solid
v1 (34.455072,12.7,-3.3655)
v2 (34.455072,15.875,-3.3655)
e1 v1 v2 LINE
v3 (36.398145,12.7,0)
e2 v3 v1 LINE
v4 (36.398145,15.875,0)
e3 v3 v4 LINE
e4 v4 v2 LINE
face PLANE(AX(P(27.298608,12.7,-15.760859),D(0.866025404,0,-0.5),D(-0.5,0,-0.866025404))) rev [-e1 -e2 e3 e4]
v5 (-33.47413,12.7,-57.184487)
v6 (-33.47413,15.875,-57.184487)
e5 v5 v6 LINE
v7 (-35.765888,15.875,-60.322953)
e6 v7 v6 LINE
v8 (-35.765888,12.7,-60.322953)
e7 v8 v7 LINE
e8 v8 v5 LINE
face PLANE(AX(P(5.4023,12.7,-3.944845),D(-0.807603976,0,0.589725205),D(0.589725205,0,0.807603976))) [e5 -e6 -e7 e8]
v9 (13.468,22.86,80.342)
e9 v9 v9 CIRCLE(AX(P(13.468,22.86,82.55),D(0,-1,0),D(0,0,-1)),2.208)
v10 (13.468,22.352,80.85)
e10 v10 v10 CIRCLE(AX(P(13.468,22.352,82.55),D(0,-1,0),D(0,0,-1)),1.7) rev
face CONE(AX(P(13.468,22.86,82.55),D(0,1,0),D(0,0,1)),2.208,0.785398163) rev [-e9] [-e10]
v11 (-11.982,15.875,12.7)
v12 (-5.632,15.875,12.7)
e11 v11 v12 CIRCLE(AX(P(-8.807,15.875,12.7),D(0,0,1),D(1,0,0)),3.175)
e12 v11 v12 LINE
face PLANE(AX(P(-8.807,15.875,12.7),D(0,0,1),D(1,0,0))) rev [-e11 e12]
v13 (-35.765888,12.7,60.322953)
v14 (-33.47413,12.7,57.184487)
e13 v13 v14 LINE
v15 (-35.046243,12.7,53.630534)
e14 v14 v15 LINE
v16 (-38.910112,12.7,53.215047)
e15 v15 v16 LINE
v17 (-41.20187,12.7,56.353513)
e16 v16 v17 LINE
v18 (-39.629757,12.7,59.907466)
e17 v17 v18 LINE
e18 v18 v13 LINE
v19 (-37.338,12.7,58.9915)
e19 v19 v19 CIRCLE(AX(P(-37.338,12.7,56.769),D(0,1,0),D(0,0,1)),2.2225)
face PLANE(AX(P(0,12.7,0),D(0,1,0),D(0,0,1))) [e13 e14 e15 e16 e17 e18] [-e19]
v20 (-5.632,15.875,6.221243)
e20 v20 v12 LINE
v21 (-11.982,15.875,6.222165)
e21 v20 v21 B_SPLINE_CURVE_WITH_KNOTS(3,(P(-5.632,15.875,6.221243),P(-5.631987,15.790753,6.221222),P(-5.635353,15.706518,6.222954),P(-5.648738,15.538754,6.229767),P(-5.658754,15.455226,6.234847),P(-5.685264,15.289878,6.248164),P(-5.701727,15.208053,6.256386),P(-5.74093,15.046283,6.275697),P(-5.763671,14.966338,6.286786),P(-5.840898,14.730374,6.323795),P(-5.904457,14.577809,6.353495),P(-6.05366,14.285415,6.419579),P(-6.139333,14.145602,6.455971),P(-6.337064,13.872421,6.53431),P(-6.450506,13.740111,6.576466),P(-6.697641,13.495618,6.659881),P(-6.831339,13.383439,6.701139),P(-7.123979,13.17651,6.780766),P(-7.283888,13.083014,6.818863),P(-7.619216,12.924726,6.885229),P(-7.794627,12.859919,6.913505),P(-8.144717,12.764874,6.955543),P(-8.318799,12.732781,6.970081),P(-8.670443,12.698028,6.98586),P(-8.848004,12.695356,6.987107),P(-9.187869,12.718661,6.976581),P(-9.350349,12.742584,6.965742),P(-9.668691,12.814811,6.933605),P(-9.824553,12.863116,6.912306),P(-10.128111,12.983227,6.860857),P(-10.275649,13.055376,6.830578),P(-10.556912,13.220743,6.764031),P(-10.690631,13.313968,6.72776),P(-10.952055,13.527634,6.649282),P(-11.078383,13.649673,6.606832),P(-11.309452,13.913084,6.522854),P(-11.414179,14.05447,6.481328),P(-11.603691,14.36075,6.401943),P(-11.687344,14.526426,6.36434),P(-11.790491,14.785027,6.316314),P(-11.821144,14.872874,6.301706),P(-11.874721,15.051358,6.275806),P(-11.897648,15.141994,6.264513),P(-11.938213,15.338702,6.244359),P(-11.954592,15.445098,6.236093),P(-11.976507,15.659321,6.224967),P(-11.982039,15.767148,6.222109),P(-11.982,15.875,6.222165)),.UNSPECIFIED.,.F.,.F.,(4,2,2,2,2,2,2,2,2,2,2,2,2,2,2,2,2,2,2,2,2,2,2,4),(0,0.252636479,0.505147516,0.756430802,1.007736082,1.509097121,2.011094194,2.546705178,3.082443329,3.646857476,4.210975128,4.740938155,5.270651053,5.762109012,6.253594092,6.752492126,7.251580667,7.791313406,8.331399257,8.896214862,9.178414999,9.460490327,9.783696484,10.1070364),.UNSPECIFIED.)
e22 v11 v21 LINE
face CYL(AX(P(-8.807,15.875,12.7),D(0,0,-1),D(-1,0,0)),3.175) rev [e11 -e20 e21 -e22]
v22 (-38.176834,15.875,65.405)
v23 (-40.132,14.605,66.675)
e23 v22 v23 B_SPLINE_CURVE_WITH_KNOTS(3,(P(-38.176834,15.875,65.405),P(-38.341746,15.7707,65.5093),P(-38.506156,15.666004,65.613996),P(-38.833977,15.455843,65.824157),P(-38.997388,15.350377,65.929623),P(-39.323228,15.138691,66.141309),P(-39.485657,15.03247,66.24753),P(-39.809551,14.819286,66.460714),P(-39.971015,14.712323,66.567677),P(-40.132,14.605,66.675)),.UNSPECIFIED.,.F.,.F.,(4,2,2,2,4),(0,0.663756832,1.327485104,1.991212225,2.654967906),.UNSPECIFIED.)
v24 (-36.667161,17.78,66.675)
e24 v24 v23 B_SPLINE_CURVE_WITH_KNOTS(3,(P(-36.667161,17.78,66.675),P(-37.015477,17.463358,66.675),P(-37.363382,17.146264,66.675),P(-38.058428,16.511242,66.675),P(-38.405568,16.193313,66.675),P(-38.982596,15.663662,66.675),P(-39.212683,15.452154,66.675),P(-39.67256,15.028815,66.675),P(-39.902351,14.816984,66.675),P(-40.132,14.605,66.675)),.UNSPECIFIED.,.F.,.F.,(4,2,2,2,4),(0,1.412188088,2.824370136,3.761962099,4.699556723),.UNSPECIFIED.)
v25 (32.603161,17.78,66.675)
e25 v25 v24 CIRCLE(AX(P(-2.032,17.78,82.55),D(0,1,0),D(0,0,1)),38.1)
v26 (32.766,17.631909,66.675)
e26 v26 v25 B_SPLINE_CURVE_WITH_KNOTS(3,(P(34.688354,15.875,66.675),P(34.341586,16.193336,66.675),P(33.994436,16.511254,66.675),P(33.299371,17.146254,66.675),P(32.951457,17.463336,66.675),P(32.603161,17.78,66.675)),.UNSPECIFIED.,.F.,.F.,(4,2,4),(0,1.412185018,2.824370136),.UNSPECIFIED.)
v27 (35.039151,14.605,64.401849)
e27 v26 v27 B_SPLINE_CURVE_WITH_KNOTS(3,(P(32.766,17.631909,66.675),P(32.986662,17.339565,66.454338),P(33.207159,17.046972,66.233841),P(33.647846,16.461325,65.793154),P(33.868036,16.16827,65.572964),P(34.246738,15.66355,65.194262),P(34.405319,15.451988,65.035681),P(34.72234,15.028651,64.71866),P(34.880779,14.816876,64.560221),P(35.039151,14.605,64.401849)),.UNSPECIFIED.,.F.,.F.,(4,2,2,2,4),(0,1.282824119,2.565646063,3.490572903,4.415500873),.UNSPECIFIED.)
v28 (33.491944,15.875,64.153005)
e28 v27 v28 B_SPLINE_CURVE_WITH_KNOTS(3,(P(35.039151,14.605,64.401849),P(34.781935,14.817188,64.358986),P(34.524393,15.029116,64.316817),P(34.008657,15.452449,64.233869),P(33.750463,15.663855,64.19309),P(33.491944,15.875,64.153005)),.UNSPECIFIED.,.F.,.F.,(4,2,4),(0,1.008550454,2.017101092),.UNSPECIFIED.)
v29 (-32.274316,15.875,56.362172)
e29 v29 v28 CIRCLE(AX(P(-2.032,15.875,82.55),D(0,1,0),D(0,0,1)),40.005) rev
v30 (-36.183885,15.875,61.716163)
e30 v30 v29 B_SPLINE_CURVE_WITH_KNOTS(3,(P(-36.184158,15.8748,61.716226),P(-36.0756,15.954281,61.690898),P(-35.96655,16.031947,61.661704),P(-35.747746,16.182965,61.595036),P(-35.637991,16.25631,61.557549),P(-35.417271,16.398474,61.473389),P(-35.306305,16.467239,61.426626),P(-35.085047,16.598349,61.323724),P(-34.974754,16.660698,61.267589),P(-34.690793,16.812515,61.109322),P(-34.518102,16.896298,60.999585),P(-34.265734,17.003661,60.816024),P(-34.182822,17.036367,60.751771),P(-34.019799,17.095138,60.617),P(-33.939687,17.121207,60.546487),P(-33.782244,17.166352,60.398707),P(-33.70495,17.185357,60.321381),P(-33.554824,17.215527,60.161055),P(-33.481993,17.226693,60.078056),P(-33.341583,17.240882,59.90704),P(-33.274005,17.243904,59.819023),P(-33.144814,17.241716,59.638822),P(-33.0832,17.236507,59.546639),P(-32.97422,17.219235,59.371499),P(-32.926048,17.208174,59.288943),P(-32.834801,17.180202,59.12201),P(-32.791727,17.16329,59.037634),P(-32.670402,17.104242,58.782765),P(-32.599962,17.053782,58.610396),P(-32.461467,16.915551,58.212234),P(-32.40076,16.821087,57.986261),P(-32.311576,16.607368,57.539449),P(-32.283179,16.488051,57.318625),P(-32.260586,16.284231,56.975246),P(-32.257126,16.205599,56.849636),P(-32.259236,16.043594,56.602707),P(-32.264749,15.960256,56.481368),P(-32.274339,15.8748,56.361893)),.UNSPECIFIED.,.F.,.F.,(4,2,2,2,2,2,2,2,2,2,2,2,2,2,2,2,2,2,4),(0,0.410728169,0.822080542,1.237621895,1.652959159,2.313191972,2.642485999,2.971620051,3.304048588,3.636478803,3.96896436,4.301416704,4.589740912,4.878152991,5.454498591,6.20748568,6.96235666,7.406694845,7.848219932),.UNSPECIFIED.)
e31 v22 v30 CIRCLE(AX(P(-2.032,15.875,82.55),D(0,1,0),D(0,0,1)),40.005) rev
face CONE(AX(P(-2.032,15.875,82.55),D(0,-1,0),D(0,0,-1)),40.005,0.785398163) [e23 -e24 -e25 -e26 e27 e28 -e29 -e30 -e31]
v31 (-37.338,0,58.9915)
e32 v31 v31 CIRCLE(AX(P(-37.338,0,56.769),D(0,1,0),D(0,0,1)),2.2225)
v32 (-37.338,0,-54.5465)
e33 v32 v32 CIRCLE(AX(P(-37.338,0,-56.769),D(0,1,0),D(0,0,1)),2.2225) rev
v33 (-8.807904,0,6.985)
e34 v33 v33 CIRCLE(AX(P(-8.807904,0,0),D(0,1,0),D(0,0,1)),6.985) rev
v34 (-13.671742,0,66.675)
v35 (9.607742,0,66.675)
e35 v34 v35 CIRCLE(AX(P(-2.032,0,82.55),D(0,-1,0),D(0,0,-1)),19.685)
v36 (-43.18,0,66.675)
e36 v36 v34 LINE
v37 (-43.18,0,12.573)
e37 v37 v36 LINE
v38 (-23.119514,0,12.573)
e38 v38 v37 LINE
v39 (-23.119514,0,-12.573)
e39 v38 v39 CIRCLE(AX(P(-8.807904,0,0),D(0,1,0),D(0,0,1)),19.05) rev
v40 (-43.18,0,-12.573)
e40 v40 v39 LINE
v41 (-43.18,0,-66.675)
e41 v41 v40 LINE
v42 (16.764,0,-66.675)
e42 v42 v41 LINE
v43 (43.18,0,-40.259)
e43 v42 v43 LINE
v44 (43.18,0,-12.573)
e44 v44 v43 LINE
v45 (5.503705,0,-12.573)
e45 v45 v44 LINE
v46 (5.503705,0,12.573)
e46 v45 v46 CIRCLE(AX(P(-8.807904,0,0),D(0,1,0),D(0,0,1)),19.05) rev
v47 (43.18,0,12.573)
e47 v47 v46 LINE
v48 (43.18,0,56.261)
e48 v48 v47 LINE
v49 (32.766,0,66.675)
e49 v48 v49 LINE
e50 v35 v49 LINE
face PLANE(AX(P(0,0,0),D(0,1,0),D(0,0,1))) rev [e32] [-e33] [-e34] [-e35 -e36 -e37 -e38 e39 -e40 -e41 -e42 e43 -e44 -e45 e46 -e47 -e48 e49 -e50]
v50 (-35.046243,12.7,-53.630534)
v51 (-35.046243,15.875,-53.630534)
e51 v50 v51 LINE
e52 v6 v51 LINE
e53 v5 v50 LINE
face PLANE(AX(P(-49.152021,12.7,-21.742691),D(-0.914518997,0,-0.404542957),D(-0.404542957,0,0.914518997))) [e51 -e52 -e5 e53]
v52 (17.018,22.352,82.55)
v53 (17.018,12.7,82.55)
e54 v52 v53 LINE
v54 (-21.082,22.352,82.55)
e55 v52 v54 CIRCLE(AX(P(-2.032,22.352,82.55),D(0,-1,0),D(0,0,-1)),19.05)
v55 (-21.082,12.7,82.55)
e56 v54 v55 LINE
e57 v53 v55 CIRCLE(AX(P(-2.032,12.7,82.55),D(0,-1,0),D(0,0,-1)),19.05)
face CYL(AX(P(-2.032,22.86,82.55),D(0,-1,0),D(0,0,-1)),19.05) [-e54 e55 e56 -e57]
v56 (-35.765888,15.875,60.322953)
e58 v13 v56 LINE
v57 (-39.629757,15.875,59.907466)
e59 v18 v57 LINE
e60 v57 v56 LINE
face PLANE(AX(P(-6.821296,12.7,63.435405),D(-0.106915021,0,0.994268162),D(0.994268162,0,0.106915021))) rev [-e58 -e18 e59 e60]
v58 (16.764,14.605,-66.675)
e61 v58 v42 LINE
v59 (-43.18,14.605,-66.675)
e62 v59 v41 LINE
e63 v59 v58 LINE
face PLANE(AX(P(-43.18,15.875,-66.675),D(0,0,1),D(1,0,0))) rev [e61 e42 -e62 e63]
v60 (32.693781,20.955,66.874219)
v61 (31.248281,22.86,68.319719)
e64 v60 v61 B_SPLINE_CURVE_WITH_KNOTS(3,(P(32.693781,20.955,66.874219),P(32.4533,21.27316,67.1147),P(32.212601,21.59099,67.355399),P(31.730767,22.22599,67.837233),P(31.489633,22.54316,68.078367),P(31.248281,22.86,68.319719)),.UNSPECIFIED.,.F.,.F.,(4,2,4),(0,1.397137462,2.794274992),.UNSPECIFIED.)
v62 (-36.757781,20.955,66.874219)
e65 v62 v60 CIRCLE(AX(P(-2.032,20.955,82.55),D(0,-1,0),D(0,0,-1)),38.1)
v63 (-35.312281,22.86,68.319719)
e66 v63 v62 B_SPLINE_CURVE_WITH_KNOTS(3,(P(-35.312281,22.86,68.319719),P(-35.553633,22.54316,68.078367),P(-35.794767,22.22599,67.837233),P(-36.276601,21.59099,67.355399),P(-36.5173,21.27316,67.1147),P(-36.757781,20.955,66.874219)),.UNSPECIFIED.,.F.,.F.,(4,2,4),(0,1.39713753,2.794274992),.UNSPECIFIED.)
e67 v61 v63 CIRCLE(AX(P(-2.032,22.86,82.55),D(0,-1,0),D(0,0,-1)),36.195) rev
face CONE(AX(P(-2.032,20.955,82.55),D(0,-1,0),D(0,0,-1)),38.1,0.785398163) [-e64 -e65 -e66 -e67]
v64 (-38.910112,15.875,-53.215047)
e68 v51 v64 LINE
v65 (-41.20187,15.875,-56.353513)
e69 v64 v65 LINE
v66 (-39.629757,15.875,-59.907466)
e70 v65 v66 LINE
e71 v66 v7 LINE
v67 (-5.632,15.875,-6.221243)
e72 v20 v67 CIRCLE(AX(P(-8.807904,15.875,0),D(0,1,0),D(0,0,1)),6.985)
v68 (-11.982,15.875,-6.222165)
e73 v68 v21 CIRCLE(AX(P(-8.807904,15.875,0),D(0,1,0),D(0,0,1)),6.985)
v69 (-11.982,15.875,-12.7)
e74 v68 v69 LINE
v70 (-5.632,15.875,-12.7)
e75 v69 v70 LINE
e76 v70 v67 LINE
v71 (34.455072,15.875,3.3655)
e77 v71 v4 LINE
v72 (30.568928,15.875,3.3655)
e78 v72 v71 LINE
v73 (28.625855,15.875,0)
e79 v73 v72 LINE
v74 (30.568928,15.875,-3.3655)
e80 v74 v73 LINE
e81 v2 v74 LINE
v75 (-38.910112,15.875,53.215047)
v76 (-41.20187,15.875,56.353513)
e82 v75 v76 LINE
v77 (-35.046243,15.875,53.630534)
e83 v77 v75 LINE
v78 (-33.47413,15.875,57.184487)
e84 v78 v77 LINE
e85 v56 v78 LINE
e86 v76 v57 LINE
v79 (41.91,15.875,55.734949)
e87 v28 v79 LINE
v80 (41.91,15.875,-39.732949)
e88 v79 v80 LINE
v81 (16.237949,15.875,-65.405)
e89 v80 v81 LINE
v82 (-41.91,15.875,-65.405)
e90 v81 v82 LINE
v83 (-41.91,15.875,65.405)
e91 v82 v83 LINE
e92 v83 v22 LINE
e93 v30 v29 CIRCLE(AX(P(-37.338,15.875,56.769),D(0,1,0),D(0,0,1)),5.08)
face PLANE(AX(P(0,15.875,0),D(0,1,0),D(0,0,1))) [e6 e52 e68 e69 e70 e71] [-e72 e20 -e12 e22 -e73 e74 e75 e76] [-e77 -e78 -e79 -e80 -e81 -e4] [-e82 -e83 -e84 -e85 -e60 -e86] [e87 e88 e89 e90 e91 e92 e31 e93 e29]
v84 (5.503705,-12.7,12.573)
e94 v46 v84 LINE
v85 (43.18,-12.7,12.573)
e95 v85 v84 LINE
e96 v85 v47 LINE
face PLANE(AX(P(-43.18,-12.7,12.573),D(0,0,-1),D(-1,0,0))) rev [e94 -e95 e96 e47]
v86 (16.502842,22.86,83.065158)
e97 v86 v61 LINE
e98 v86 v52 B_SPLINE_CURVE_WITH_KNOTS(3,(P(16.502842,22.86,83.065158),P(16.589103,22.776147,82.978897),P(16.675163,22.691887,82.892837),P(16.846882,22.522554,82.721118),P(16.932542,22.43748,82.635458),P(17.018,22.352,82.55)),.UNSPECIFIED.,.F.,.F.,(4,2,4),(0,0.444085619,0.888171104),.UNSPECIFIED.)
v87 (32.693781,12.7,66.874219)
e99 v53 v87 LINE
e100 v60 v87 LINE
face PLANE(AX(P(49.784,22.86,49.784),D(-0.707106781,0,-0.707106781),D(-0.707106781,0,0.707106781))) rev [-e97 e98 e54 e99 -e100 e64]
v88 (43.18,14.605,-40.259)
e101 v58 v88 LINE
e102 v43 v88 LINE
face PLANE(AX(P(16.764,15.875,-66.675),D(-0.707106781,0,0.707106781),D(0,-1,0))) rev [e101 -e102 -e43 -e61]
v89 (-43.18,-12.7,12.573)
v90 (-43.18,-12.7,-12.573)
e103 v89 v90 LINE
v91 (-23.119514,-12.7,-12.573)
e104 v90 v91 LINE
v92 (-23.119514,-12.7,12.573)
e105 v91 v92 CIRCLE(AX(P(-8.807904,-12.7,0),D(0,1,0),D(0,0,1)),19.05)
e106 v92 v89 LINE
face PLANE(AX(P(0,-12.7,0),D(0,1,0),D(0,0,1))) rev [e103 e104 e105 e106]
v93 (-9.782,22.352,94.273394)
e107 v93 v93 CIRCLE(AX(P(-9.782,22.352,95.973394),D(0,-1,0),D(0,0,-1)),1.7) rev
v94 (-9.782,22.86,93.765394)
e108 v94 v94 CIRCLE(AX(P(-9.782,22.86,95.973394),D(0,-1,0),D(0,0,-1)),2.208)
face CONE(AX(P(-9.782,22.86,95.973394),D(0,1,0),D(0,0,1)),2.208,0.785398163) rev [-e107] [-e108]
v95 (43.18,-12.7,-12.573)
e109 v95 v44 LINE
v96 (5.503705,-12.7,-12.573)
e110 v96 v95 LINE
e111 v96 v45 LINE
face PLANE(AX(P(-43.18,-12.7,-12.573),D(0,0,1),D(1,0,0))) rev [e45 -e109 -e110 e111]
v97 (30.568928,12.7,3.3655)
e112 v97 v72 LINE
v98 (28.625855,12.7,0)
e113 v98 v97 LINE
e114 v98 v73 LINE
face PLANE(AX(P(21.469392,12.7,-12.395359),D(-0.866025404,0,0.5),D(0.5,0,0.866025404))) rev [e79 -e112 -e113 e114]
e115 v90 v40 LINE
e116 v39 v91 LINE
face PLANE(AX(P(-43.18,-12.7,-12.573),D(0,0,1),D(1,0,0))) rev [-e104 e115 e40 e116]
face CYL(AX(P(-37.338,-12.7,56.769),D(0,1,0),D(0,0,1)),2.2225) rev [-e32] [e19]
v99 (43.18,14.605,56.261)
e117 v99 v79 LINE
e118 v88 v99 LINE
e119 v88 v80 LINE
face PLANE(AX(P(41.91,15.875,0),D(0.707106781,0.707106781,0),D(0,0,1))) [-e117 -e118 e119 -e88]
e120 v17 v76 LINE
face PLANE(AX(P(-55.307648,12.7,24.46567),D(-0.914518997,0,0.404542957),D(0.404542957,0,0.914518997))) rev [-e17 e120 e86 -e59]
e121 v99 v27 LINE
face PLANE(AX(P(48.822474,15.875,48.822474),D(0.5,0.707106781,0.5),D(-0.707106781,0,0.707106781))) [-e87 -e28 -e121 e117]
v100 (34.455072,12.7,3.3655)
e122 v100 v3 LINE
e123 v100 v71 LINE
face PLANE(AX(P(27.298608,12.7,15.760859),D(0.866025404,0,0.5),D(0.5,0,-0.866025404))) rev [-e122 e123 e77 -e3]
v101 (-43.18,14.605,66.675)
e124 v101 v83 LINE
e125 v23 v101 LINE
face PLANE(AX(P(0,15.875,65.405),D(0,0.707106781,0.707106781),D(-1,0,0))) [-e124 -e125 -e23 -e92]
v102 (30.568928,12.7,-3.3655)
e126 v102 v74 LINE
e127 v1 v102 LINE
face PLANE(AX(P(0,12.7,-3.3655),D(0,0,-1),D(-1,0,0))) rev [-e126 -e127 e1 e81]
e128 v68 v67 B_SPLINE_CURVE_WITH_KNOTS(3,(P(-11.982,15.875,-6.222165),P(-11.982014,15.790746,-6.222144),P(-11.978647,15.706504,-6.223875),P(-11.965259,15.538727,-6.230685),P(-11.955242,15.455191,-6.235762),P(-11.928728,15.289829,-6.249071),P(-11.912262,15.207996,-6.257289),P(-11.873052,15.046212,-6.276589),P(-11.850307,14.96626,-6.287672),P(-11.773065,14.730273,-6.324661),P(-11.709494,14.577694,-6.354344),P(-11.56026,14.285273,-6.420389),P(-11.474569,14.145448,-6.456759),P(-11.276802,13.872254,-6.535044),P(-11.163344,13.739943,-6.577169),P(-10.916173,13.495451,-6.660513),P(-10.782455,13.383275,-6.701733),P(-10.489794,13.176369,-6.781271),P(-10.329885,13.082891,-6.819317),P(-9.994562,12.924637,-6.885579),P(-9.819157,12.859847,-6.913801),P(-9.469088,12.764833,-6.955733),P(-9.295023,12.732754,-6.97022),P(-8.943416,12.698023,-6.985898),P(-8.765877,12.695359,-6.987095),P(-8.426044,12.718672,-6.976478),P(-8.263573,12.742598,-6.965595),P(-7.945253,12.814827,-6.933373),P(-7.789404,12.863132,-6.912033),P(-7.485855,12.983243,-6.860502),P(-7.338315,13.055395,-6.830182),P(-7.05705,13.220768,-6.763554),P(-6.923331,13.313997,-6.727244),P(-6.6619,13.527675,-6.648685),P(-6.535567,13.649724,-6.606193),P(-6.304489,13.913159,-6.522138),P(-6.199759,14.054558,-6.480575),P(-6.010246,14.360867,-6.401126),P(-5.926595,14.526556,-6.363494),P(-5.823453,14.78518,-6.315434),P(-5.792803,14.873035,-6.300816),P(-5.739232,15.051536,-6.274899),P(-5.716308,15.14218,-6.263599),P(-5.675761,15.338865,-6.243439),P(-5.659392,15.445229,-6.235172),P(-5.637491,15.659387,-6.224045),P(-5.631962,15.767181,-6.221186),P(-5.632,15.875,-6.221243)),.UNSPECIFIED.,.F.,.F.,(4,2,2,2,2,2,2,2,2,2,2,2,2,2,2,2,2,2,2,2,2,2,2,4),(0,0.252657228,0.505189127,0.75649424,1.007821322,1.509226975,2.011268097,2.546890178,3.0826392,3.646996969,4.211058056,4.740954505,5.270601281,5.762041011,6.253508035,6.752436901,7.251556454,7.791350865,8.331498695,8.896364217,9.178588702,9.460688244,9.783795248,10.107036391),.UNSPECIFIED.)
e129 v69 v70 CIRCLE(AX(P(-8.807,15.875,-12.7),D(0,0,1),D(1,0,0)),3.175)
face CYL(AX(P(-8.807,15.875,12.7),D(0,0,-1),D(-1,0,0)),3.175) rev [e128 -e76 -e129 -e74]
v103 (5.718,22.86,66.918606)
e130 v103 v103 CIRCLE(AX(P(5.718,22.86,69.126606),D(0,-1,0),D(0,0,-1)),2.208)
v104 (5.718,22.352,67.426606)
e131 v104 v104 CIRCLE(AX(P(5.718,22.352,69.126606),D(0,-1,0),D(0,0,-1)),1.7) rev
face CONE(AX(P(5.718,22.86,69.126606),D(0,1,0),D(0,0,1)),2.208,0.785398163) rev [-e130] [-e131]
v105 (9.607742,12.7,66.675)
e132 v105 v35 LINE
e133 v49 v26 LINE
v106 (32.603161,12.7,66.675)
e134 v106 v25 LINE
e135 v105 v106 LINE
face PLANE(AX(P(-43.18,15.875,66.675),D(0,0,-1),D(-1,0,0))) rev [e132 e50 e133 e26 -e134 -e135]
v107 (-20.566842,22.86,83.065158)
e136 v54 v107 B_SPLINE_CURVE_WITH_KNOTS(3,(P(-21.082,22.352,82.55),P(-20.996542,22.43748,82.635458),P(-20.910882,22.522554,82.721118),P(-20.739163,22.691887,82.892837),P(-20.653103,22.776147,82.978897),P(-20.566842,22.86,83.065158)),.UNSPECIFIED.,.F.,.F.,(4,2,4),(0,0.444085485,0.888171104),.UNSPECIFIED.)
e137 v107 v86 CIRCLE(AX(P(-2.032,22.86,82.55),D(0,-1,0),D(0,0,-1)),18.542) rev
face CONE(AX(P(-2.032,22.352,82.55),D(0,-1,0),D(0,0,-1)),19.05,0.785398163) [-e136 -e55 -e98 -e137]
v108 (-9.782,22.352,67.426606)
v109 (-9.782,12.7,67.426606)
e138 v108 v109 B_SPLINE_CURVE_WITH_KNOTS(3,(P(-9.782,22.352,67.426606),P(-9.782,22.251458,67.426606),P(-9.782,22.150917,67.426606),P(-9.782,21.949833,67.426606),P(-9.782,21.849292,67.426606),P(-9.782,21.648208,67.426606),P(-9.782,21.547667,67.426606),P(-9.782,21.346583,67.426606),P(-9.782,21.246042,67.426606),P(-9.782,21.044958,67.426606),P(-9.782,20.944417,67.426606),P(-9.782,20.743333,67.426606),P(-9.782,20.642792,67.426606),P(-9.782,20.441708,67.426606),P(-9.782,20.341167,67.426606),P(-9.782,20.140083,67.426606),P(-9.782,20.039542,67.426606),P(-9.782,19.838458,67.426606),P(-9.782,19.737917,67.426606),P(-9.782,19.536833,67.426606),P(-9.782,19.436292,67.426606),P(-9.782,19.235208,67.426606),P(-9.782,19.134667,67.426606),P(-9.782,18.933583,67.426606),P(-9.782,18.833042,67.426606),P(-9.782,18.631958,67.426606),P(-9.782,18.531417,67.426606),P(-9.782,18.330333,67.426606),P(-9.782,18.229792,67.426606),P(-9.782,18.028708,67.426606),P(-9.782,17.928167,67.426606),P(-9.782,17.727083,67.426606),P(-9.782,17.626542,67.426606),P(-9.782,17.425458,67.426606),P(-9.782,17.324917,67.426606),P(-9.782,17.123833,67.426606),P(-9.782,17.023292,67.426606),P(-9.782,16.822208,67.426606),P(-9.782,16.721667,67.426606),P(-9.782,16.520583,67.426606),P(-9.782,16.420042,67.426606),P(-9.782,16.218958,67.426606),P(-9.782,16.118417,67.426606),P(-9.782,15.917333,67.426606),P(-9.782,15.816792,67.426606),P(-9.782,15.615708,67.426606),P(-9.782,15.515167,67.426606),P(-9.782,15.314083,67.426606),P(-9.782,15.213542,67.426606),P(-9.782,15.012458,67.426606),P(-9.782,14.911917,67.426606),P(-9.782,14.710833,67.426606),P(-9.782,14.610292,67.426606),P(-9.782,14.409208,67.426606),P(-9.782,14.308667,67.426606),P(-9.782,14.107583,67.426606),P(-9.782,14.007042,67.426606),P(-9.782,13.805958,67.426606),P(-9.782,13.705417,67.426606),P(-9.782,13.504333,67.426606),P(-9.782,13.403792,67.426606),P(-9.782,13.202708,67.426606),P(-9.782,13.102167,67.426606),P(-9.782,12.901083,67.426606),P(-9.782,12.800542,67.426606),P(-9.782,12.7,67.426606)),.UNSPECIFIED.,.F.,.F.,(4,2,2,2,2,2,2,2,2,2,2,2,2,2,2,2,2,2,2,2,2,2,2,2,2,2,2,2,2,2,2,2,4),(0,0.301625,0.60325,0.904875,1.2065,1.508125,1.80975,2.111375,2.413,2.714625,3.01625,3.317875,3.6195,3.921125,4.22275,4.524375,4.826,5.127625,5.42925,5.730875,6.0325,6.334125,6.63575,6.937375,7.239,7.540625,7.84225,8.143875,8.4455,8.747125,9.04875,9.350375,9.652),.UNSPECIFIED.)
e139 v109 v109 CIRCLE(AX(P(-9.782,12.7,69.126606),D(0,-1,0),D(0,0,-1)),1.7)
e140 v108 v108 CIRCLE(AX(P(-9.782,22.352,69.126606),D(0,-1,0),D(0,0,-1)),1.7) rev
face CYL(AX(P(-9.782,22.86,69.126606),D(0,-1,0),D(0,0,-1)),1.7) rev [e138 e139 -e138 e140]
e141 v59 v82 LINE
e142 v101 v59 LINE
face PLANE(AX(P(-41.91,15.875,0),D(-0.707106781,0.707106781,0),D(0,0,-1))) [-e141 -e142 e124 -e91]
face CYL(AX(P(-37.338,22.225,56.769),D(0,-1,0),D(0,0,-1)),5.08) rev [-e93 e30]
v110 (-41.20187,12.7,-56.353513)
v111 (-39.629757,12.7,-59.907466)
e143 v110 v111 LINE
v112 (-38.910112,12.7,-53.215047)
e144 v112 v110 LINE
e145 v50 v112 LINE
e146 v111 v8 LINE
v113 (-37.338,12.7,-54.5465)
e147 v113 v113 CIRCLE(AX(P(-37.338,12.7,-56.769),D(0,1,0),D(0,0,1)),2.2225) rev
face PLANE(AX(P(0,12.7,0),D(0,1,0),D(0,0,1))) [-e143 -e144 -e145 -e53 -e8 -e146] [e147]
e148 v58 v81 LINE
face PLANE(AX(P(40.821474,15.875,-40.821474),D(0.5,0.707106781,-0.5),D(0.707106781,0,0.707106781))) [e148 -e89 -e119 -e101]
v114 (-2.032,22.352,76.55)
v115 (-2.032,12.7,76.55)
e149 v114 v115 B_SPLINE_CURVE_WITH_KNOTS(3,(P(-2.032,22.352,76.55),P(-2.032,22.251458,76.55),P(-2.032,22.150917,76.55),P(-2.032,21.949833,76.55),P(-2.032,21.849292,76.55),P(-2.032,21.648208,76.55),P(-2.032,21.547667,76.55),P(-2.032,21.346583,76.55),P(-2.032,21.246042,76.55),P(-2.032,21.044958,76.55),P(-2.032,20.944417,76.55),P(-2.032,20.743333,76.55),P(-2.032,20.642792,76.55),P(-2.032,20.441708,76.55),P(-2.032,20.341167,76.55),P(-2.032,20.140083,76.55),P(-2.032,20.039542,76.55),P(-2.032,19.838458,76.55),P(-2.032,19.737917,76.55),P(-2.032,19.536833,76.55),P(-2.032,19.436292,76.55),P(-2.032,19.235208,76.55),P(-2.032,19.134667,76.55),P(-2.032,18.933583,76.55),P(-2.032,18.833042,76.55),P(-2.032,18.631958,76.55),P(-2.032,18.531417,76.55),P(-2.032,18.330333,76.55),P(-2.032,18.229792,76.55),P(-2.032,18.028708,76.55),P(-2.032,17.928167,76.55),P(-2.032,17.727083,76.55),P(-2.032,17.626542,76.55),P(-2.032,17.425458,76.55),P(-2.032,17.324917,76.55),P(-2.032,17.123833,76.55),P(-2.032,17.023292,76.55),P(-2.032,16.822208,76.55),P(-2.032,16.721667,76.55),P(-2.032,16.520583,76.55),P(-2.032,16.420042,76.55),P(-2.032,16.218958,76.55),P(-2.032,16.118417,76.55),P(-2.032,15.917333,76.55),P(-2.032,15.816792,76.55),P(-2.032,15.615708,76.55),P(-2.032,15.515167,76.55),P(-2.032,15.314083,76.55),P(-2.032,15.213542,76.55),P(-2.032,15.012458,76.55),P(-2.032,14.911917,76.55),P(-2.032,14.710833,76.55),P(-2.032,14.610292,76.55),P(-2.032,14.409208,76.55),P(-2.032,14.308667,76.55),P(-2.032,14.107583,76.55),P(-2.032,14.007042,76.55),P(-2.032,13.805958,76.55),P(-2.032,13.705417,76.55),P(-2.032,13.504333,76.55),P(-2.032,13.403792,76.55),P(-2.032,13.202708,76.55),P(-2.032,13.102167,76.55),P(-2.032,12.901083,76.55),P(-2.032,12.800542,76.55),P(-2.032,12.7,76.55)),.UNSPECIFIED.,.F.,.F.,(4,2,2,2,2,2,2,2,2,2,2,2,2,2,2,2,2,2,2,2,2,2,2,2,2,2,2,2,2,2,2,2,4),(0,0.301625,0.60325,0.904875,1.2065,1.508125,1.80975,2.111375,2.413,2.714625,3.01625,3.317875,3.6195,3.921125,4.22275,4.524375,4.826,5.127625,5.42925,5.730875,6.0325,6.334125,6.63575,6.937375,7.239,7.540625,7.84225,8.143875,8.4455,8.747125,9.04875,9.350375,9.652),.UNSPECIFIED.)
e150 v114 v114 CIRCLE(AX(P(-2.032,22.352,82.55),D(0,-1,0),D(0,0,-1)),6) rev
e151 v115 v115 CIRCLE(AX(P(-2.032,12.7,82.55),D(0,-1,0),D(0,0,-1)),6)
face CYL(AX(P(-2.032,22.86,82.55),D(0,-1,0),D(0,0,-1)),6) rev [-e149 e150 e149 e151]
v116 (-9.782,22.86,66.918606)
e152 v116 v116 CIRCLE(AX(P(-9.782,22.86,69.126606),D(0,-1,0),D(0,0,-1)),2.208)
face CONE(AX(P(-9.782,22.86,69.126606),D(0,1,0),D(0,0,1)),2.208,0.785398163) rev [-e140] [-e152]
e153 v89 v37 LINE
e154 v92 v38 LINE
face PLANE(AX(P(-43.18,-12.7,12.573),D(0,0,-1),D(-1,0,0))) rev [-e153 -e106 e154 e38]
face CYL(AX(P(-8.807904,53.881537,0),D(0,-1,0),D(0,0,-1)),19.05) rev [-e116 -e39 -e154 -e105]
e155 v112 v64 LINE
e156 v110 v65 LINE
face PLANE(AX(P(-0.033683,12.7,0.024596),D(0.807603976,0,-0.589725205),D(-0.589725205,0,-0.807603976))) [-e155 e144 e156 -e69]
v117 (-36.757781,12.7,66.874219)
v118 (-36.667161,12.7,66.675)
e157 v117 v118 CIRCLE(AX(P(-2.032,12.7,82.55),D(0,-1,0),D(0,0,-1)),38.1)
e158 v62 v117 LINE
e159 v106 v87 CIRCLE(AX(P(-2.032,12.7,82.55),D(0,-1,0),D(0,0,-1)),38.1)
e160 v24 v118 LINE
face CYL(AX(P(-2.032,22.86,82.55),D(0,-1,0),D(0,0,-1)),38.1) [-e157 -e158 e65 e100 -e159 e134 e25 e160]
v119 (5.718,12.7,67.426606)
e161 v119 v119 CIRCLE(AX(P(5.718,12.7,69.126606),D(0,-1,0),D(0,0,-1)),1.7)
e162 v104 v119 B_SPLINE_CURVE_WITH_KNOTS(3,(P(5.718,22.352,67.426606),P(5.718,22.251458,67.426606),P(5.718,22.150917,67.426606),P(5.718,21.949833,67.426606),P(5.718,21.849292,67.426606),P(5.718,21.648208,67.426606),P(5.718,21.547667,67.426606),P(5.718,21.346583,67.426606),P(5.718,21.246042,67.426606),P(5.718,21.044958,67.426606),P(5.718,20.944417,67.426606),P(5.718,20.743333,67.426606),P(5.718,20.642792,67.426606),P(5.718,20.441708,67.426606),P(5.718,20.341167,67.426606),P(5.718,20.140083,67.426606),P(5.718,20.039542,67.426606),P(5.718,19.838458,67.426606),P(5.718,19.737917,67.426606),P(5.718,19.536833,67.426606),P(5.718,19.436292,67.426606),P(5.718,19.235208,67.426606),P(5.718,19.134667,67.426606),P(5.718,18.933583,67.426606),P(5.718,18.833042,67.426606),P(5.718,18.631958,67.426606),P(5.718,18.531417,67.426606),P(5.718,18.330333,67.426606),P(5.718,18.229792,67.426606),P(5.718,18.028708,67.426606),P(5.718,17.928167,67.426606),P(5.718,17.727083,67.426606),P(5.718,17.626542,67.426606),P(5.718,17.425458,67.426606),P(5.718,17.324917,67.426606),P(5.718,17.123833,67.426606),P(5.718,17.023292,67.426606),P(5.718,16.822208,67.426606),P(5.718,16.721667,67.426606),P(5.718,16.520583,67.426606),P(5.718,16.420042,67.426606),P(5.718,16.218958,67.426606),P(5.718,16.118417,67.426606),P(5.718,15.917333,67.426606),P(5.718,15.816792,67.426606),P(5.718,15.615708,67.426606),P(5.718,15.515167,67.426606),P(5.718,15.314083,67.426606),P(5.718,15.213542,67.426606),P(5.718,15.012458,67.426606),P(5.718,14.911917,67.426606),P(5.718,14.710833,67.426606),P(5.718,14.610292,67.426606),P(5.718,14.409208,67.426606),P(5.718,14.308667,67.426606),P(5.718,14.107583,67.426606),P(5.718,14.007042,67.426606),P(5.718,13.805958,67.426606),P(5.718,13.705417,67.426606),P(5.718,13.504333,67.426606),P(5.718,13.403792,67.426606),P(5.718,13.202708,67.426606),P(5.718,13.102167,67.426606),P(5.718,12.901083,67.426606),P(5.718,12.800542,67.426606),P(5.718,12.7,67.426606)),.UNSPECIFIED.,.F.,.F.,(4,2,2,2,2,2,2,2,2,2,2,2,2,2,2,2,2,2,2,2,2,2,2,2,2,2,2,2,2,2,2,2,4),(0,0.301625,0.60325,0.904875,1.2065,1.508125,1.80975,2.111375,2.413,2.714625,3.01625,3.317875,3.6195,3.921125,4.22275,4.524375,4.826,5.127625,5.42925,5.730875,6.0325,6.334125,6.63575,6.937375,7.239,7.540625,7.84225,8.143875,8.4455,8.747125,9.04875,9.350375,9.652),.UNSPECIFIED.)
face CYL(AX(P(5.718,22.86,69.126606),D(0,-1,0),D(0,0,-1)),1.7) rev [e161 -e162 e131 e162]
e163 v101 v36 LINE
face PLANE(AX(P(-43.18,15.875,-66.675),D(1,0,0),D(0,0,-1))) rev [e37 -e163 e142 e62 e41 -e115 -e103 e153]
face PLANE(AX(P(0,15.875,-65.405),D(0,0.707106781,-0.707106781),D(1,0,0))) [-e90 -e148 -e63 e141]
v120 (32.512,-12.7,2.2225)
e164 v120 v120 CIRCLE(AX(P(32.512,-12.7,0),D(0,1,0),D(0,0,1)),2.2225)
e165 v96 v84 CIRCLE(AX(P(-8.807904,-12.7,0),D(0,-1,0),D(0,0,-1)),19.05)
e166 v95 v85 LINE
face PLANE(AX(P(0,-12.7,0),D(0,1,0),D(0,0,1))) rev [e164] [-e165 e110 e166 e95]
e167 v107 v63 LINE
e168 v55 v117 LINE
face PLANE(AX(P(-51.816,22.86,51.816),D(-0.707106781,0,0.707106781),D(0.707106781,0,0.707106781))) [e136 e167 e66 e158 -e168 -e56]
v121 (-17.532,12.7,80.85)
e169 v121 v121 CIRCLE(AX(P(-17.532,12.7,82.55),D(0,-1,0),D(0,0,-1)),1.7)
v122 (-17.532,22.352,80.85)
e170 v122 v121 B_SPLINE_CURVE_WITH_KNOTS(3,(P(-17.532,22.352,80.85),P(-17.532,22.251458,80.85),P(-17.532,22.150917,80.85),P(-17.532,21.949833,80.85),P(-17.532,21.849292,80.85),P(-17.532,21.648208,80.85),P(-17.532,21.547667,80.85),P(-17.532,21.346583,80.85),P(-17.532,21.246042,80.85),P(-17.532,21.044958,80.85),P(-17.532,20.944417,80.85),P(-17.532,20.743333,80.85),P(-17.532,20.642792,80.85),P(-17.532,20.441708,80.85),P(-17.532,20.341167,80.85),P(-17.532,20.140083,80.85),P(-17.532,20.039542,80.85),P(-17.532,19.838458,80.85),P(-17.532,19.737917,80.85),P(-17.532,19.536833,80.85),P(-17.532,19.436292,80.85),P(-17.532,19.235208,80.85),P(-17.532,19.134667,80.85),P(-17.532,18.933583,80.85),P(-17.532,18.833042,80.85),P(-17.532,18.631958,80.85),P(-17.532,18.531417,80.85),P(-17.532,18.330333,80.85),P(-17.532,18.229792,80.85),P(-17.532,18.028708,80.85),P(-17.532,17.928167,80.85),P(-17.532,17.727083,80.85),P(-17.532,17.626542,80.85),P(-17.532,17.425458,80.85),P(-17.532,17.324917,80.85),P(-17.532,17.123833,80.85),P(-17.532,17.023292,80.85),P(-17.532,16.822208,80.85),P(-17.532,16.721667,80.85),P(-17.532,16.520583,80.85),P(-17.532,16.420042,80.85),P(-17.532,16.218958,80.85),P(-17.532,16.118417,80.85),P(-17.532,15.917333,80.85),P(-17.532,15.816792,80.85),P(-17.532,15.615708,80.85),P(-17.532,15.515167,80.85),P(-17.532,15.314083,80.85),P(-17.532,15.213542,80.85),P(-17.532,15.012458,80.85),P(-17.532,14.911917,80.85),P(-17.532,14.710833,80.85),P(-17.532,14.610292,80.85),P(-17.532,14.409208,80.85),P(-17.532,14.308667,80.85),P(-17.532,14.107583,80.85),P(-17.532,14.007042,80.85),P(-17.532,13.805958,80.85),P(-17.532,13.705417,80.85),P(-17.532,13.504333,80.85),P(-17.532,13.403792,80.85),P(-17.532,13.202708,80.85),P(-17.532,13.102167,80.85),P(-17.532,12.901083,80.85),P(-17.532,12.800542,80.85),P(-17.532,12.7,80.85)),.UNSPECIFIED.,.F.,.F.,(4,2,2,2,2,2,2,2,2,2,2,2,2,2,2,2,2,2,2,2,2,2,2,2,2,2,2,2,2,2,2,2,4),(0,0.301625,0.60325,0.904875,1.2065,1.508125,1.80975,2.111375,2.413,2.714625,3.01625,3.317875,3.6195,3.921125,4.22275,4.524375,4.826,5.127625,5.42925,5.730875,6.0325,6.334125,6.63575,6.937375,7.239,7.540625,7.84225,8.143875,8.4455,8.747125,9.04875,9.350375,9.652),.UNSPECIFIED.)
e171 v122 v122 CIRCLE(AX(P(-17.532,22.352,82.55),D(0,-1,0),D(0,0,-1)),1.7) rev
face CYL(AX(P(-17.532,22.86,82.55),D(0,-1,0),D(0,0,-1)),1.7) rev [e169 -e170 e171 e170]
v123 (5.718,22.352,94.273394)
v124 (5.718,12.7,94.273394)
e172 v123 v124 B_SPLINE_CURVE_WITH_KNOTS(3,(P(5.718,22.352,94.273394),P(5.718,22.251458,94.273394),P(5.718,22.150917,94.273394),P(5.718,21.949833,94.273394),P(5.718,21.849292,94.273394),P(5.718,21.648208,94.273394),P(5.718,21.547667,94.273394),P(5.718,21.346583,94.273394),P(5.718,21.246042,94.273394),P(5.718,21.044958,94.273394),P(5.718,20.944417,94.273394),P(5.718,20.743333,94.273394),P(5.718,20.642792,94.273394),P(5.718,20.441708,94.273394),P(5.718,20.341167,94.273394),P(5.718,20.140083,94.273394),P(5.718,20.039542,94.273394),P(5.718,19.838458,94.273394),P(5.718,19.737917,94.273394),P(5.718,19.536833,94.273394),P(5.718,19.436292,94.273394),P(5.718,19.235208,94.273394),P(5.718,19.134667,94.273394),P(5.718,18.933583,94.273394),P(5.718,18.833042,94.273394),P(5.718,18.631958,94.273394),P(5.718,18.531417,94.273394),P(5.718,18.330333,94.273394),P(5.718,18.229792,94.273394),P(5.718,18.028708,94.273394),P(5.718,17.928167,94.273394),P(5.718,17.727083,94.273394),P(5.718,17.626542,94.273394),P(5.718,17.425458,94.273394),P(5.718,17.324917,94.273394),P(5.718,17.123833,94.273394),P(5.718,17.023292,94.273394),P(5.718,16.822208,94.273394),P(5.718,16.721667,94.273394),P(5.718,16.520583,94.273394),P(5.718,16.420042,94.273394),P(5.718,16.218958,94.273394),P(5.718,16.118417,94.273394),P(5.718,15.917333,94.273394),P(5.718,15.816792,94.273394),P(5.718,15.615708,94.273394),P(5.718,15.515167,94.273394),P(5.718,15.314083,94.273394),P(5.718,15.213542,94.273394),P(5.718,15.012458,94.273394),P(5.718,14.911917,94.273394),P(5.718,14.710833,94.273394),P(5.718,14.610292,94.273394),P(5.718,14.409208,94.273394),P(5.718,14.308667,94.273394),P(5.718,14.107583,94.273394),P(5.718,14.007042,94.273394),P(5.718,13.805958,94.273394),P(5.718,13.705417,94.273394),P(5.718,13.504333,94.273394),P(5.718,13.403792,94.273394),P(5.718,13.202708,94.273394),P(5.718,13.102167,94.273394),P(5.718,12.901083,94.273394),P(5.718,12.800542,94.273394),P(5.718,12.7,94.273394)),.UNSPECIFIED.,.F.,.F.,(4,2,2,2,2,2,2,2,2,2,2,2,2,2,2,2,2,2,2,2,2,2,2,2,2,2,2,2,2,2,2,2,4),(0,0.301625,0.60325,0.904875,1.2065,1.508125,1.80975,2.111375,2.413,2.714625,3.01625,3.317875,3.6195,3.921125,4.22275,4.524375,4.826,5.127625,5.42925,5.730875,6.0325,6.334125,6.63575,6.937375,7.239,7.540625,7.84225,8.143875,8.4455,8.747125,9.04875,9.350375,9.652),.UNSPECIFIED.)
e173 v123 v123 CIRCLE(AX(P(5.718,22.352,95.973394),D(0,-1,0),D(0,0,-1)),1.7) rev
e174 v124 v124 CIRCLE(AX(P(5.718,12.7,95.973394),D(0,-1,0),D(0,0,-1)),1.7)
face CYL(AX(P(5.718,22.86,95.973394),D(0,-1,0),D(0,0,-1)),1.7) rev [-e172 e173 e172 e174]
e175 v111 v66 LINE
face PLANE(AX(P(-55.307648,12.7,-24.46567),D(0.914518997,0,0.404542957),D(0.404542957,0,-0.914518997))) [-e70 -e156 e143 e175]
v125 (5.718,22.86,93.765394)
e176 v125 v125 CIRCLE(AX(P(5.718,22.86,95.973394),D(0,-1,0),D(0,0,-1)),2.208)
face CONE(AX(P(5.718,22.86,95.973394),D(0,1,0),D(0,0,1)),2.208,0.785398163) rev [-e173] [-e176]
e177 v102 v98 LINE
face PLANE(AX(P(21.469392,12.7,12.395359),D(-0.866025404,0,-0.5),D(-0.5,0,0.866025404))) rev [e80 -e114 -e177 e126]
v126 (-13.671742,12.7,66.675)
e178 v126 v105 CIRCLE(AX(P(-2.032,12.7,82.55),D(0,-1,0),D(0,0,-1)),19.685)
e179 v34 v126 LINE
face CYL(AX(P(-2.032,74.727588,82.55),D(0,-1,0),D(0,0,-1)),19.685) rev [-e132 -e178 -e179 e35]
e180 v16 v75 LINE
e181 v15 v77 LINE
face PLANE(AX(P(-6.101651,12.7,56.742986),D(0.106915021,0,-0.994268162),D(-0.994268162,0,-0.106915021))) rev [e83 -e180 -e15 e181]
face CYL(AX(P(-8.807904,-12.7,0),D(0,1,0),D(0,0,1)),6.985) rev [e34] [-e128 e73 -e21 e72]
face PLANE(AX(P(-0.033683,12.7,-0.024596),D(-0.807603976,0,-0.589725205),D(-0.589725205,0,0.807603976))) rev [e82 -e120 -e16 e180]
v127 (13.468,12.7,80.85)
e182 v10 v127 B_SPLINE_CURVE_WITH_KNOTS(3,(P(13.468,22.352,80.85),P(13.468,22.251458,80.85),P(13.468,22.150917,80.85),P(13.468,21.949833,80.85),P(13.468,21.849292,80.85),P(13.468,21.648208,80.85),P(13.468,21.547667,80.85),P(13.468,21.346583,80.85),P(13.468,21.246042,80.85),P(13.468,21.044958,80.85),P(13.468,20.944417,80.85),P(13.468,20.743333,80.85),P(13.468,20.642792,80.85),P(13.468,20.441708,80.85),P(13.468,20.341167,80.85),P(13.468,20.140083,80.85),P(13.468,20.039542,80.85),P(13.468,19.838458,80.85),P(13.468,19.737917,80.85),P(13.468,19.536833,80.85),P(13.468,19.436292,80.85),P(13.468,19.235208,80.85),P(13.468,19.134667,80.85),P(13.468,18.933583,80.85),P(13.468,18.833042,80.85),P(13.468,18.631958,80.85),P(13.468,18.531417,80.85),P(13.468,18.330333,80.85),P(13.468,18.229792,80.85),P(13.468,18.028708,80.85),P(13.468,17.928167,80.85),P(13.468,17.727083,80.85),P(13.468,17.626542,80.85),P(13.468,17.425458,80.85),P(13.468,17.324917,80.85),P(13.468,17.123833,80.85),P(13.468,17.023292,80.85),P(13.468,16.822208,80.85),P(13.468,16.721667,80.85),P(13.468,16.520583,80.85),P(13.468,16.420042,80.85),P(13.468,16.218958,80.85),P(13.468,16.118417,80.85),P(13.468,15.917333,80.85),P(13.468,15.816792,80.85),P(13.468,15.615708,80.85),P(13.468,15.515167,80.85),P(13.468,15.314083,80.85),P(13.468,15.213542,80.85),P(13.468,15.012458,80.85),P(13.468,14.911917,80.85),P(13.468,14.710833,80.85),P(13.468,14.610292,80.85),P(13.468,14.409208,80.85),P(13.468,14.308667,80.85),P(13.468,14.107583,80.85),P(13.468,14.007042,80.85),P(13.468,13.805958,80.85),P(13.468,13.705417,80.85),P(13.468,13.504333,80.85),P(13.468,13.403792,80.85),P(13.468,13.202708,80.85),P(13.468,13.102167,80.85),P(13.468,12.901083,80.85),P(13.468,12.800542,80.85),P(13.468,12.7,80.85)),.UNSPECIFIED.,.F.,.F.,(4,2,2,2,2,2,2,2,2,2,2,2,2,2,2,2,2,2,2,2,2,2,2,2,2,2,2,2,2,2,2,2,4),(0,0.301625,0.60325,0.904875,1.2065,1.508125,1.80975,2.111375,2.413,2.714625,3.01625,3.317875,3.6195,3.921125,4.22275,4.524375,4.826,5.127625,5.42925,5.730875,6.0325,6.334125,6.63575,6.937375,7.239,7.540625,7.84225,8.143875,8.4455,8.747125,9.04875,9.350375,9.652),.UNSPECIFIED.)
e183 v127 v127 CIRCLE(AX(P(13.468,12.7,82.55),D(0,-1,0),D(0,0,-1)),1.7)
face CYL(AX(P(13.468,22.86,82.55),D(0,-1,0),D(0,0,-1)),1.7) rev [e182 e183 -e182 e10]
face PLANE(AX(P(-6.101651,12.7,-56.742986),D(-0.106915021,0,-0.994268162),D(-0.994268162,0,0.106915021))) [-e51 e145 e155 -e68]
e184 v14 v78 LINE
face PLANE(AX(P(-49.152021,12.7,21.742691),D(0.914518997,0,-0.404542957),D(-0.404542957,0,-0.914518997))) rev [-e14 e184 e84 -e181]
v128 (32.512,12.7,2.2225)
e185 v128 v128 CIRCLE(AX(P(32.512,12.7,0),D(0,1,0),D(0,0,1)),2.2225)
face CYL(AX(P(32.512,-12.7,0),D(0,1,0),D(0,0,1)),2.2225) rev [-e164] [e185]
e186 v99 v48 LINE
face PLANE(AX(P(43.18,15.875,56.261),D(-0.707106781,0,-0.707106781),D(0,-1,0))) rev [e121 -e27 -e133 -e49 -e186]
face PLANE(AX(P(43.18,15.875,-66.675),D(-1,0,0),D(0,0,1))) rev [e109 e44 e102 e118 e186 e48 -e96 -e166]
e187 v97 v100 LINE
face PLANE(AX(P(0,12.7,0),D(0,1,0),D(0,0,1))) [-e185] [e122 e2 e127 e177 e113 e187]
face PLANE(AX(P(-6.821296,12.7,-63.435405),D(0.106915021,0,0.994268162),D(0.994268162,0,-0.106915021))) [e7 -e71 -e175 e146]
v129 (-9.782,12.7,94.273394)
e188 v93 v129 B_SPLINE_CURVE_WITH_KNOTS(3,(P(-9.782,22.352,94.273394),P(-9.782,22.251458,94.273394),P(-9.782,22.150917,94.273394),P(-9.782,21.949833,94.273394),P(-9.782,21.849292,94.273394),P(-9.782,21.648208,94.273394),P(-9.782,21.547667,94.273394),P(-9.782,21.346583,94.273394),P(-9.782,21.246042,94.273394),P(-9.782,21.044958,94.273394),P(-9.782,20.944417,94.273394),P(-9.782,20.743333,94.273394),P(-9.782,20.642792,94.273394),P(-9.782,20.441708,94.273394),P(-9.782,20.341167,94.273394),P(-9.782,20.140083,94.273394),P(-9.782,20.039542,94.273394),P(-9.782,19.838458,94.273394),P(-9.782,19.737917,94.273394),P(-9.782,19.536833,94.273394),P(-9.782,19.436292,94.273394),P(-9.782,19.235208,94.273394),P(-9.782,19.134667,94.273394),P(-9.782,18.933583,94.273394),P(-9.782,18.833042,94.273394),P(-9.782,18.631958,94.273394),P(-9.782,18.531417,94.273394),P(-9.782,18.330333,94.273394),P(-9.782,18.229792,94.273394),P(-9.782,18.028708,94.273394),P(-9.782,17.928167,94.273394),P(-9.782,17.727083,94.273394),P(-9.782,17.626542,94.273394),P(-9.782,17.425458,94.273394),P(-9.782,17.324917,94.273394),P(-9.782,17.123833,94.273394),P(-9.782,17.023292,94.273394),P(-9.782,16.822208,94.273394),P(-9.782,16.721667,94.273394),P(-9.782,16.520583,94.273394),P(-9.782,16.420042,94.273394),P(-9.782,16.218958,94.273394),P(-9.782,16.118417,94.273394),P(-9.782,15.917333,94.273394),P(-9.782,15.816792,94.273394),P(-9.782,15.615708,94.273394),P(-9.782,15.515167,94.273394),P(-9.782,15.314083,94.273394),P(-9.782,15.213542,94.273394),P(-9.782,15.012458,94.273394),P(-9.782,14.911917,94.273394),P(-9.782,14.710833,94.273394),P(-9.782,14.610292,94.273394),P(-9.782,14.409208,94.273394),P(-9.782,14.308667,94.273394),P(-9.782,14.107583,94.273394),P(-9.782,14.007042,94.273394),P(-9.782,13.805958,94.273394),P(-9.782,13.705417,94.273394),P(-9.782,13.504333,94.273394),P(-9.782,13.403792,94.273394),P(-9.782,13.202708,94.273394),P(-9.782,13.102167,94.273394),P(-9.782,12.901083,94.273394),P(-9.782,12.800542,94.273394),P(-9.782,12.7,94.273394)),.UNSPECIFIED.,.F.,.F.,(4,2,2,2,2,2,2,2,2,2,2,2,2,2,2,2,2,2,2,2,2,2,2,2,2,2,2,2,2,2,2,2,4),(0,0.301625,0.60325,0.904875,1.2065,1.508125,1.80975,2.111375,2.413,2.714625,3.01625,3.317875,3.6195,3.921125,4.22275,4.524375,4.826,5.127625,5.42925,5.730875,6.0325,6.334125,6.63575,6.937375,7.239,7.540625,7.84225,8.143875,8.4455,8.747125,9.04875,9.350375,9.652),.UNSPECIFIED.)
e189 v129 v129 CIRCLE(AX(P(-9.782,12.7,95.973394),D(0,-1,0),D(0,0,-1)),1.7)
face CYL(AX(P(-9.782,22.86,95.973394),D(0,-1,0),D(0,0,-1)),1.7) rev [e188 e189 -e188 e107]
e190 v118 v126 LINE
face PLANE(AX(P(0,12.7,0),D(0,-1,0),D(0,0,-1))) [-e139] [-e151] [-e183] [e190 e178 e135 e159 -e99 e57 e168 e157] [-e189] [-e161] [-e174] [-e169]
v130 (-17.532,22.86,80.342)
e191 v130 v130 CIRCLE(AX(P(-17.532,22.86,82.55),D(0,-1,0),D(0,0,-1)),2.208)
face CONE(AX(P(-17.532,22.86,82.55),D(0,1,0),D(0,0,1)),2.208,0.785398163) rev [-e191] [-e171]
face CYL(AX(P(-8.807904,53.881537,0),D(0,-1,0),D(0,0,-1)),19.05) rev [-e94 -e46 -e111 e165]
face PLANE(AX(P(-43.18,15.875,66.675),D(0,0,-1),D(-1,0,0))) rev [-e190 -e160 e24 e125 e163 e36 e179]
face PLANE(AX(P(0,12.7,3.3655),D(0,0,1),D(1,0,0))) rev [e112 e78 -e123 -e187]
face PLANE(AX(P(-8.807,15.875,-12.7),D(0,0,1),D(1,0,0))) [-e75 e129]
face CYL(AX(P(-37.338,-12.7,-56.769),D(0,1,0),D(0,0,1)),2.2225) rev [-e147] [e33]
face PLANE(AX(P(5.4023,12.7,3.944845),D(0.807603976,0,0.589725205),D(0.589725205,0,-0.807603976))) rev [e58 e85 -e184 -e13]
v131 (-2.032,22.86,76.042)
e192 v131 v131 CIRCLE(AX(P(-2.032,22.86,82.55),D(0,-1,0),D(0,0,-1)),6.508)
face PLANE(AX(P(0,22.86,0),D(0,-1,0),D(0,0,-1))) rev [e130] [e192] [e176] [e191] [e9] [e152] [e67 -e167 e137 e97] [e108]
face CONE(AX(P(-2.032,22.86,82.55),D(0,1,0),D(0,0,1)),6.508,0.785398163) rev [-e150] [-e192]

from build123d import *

# Parameters (mm, degrees)
SKETCH1_W               = 86.36
SKETCH1_H               = 133.35
BOSS_EXTRUDE1_DEPTH     = 15.875
SKETCH2_W               = 86.36
SKETCH2_H               = 25.146
BOSS_EXTRUDE2_DEPTH     = 12.7
SKETCH5_R               = 1.7
SKETCH5_R_2             = 6
BOSS_EXTRUDE3_DEPTH     = 3.81
SKETCH6_R               = 19.685
CUT_EXTRUDE1_DEPTH      = 19.05
CHAMFER2_SIZE           = 0.508
SKETCH5_4_R             = 1.7
SKETCH5_4_R_2           = 6
BOSS_EXTRUDE4_DEPTH     = 6.35
CHAMFER1_SIZE           = 1.905
SKETCH7_R               = 5.08
CUT_EXTRUDE2_DEPTH      = 6.35
CUT_EXTRUDE3_DEPTH      = 3.175
CUT_EXTRUDE4_DEPTH      = 115.033341725
CUT_EXTRUDE4_DEPTH_BACK = 115.033341725
SKETCH8_3_R             = 2.2225
CUT_EXTRUDE5_DEPTH      = 115.033341725
CUT_EXTRUDE5_DEPTH_BACK = 115.033341725
SKETCH10_R              = 6.985
CUT_EXTRUDE6_DEPTH      = 12.7
CUT_EXTRUDE6_DEPTH_BACK = 12.7
SKETCH11_R              = 3.175
CHAMFER3_SIZE           = 26.416
CHAMFER4_SIZE           = 10.414
SKETCH13_R              = 19.05
CUT_EXTRUDE7_DEPTH      = 12.7
CHAMFER5_SIZE           = 1.27


with BuildPart() as part:
    # Sketch1 → Boss-Extrude1 (new body)
    with BuildSketch(Plane(origin=(0, 0, 0), x_dir=(1, 0, 0), z_dir=(0, 1, 0))):
        Rectangle(SKETCH1_W, SKETCH1_H)
    extrude(amount=BOSS_EXTRUDE1_DEPTH)

    # Sketch2 → Boss-Extrude2 (add)
    with BuildSketch(Plane.XZ):
        Rectangle(SKETCH2_W, SKETCH2_H)
    extrude(amount=BOSS_EXTRUDE2_DEPTH)

    # Sketch6 → Cut-Extrude1 (cut)
    with BuildSketch(Plane.XZ):
        with Locations((-2.032, 82.55)):
            Circle(SKETCH6_R)
    extrude(amount=-CUT_EXTRUDE1_DEPTH, mode=Mode.SUBTRACT)



with BuildPart() as body_2:
    # Sketch5 → Boss-Extrude3 (new body)
    with BuildSketch(Plane(origin=(0, 19.05, 0), x_dir=(-1, 0, 0), z_dir=(0, -1, 0))):
        with BuildLine():
            Line((-32.693781238, -66.874218762), (-17.018, -82.55))
            ThreePointArc((-17.018, -82.55), (2.032, -101.6), (21.082, -82.55))
            Line((21.082, -82.55), (36.757781238, -66.874218762))
            ThreePointArc((36.757781238, -66.874218762), (2.032, -44.45), (-32.693781238, -66.874218762))
        make_face()
        with Locations(Location((9.782, -69.126606241, 0), (0, 0, 90))):
            Circle(SKETCH5_R, mode=Mode.SUBTRACT)
        with Locations(Location((-5.718, -69.126606241, 0), (0, 0, 90))):
            Circle(SKETCH5_R, mode=Mode.SUBTRACT)
        with Locations(Location((-13.468, -82.55, 0), (0, 0, 90))):
            Circle(SKETCH5_R, mode=Mode.SUBTRACT)
        with Locations(Location((-5.718, -95.973393759, 0), (0, 0, 90))):
            Circle(SKETCH5_R, mode=Mode.SUBTRACT)
        with Locations(Location((9.782, -95.973393759, 0), (0, 0, 90))):
            Circle(SKETCH5_R, mode=Mode.SUBTRACT)
        with Locations(Location((17.532, -82.55, 0), (0, 0, 90))):
            Circle(SKETCH5_R, mode=Mode.SUBTRACT)
        with Locations(Location((2.032, -82.55, 0), (0, 0, 90))):
            Circle(SKETCH5_R_2, mode=Mode.SUBTRACT)
    extrude(amount=-BOSS_EXTRUDE3_DEPTH)

    # Chamfer2
    chamfer2_edges = [body_2.edges().sort_by_distance(p)[0] for p in [
        (-9.782, 22.86, 70.826606241),
        (-17.532, 22.86, 84.25),
        (-9.782, 22.86, 97.673393759),
        (5.718, 22.86, 97.673393759),
        (13.468, 22.86, 84.25),
        (5.718, 22.86, 70.826606241),
        (-2.032, 22.86, 101.6),
        (-2.032, 22.86, 88.55),
    ]]
    chamfer(chamfer2_edges, length=CHAMFER2_SIZE)


with BuildPart() as part_1:
    add(part.part)

    add(body_2.part)  # Boss-Extrude4 merges body 2
    # Sketch5<4> → Boss-Extrude4 (add)
    with BuildSketch(Plane(origin=(0, 19.05, 0), x_dir=(-1, 0, 0), z_dir=(0, -1, 0))):
        with BuildLine():
            Line((-32.693781238, -66.874218762), (-17.018, -82.55))
            ThreePointArc((-17.018, -82.55), (2.032, -101.6), (21.082, -82.55))
            Line((21.082, -82.55), (36.757781238, -66.874218762))
            ThreePointArc((36.757781238, -66.874218762), (2.032, -44.45), (-32.693781238, -66.874218762))
        make_face()
        with Locations(Location((9.782, -69.126606241, 0), (0, 0, 90))):
            Circle(SKETCH5_4_R, mode=Mode.SUBTRACT)
        with Locations(Location((-5.718, -69.126606241, 0), (0, 0, 90))):
            Circle(SKETCH5_4_R, mode=Mode.SUBTRACT)
        with Locations(Location((-13.468, -82.55, 0), (0, 0, 90))):
            Circle(SKETCH5_4_R, mode=Mode.SUBTRACT)
        with Locations(Location((-5.718, -95.973393759, 0), (0, 0, 90))):
            Circle(SKETCH5_4_R, mode=Mode.SUBTRACT)
        with Locations(Location((9.782, -95.973393759, 0), (0, 0, 90))):
            Circle(SKETCH5_4_R, mode=Mode.SUBTRACT)
        with Locations(Location((17.532, -82.55, 0), (0, 0, 90))):
            Circle(SKETCH5_4_R, mode=Mode.SUBTRACT)
        with Locations(Location((2.032, -82.55, 0), (0, 0, 90))):
            Circle(SKETCH5_4_R_2, mode=Mode.SUBTRACT)
    extrude(amount=BOSS_EXTRUDE4_DEPTH)

    # Chamfer1
    chamfer1_edges = [part_1.edges().sort_by_distance(p)[0] for p in [
        (-2.032, 15.875, 44.45),
        (-2.032, 22.86, 44.45),
    ]]
    chamfer(chamfer1_edges, length=CHAMFER1_SIZE)

    # Sketch7 → Cut-Extrude2 (cut)
    with BuildSketch(Plane(origin=(0, 15.875, 0), x_dir=(1, 0, 0), z_dir=(0, 1, 0))):
        with Locations((-37.338, -56.769)):
            Circle(SKETCH7_R)
    extrude(amount=CUT_EXTRUDE2_DEPTH, mode=Mode.SUBTRACT)

    # Sketch8 → Cut-Extrude3 (cut)
    with BuildSketch(Plane(origin=(0, 15.875, 0), x_dir=(1, 0, 0), z_dir=(0, 1, 0))):
        Polygon((-35.046242541, -53.63053412), (-38.910112452, -53.215046881), (-41.201869911, -56.353512761), (-39.629757459, -59.90746588), (-35.765887548, -60.322953119), (-33.474130089, -57.184487239), align=None)
        Polygon((-35.765887548, 60.322953119), (-33.474130089, 57.184487239), (-35.046242541, 53.63053412), (-38.910112452, 53.215046881), (-41.201869911, 56.353512761), (-39.629757459, 59.90746588), align=None)
        Polygon((28.625855338, 0), (30.568927669, -3.3655), (34.455072331, -3.3655), (36.398144662, 0), (34.455072331, 3.3655), (30.568927669, 3.3655), align=None)
    extrude(amount=-CUT_EXTRUDE3_DEPTH, mode=Mode.SUBTRACT)

    # Sketch8<3> → Cut-Extrude4 (cut, two sides: drawn at the far end of the back side and taken through both)
    with BuildSketch(Plane(origin=(0, 15.875, 0), x_dir=(1, 0, 0), z_dir=(0, 1, 0)).offset(-CUT_EXTRUDE4_DEPTH_BACK)):
        with Locations(Location((-37.338, -56.769, 0), (0, 0, 270))):
            Circle(SKETCH8_3_R)
        with Locations(Location((-37.338, 56.769, 0), (0, 0, 270))):
            Circle(SKETCH8_3_R)
        with Locations(Location((32.512, 0, 0), (0, 0, 270))):
            Circle(SKETCH8_3_R)
    extrude(amount=CUT_EXTRUDE4_DEPTH + CUT_EXTRUDE4_DEPTH_BACK, mode=Mode.SUBTRACT)

    # Sketch10 → Cut-Extrude5 (cut, two sides: drawn at the far end of the back side and taken through both)
    with BuildSketch(Plane(origin=(0, 15.875, 0), x_dir=(1, 0, 0), z_dir=(0, 1, 0)).offset(-CUT_EXTRUDE5_DEPTH_BACK)):
        with Locations(Location((-8.807904265, 0, 0), (0, 0, 270))):
            Circle(SKETCH10_R)
    extrude(amount=CUT_EXTRUDE5_DEPTH + CUT_EXTRUDE5_DEPTH_BACK, mode=Mode.SUBTRACT)

    # Sketch11 → Cut-Extrude6 (cut, two sides: drawn at the far end of the back side and taken through both)
    with BuildSketch(Plane.XY.offset(-CUT_EXTRUDE6_DEPTH_BACK)):
        with Locations((-8.807000374, 15.875)):
            Circle(SKETCH11_R)
    extrude(amount=CUT_EXTRUDE6_DEPTH + CUT_EXTRUDE6_DEPTH_BACK, mode=Mode.SUBTRACT)

    # Chamfer3
    chamfer3_edges = [part_1.edges().sort_by_distance(p)[0] for p in [
        (43.18, 7.9375, -66.675),
    ]]
    chamfer(chamfer3_edges, length=CHAMFER3_SIZE)

    # Chamfer4
    # the kernel refuses this chamfer: 10.414 mm, written as the material it takes off along each edge
    with BuildSketch(Plane(origin=(43.18, -26.781506637, 66.675), x_dir=(0.02749587661058629, 0, -0.9996219169112966), z_dir=(0, 1, 0))) as chamfer4_piece_1:
        Polygon((CHAMFER4_SIZE * 0.999621916911, CHAMFER4_SIZE * 0.0274958766106), (-CHAMFER4_SIZE * 0.0274958766106, CHAMFER4_SIZE * 0.999621916911), (0, 0), align=None)
    extrude(amount=69.438013273, mode=Mode.SUBTRACT)

    # Sketch13 → Cut-Extrude7 (cut)
    with BuildSketch(Plane.XZ.offset(12.7)):
        with Locations((-8.807904265, 0)):
            Circle(SKETCH13_R)
    extrude(amount=-CUT_EXTRUDE7_DEPTH, mode=Mode.SUBTRACT)

    # Chamfer5
    chamfer5_edges = [part_1.edges().sort_by_distance(p)[0] for p in [
        (-40.966177014, 15.875, 66.675),
        (-43.18, 15.875, 0),
        (-13.208, 15.875, -66.675),
        (29.972, 15.875, -53.467),
        (43.18, 15.875, 8.001),
        (38.634041338, 15.875, 60.806958662),
    ]]
    chamfer(chamfer5_edges, length=CHAMFER5_SIZE)


solid = part_1.part
